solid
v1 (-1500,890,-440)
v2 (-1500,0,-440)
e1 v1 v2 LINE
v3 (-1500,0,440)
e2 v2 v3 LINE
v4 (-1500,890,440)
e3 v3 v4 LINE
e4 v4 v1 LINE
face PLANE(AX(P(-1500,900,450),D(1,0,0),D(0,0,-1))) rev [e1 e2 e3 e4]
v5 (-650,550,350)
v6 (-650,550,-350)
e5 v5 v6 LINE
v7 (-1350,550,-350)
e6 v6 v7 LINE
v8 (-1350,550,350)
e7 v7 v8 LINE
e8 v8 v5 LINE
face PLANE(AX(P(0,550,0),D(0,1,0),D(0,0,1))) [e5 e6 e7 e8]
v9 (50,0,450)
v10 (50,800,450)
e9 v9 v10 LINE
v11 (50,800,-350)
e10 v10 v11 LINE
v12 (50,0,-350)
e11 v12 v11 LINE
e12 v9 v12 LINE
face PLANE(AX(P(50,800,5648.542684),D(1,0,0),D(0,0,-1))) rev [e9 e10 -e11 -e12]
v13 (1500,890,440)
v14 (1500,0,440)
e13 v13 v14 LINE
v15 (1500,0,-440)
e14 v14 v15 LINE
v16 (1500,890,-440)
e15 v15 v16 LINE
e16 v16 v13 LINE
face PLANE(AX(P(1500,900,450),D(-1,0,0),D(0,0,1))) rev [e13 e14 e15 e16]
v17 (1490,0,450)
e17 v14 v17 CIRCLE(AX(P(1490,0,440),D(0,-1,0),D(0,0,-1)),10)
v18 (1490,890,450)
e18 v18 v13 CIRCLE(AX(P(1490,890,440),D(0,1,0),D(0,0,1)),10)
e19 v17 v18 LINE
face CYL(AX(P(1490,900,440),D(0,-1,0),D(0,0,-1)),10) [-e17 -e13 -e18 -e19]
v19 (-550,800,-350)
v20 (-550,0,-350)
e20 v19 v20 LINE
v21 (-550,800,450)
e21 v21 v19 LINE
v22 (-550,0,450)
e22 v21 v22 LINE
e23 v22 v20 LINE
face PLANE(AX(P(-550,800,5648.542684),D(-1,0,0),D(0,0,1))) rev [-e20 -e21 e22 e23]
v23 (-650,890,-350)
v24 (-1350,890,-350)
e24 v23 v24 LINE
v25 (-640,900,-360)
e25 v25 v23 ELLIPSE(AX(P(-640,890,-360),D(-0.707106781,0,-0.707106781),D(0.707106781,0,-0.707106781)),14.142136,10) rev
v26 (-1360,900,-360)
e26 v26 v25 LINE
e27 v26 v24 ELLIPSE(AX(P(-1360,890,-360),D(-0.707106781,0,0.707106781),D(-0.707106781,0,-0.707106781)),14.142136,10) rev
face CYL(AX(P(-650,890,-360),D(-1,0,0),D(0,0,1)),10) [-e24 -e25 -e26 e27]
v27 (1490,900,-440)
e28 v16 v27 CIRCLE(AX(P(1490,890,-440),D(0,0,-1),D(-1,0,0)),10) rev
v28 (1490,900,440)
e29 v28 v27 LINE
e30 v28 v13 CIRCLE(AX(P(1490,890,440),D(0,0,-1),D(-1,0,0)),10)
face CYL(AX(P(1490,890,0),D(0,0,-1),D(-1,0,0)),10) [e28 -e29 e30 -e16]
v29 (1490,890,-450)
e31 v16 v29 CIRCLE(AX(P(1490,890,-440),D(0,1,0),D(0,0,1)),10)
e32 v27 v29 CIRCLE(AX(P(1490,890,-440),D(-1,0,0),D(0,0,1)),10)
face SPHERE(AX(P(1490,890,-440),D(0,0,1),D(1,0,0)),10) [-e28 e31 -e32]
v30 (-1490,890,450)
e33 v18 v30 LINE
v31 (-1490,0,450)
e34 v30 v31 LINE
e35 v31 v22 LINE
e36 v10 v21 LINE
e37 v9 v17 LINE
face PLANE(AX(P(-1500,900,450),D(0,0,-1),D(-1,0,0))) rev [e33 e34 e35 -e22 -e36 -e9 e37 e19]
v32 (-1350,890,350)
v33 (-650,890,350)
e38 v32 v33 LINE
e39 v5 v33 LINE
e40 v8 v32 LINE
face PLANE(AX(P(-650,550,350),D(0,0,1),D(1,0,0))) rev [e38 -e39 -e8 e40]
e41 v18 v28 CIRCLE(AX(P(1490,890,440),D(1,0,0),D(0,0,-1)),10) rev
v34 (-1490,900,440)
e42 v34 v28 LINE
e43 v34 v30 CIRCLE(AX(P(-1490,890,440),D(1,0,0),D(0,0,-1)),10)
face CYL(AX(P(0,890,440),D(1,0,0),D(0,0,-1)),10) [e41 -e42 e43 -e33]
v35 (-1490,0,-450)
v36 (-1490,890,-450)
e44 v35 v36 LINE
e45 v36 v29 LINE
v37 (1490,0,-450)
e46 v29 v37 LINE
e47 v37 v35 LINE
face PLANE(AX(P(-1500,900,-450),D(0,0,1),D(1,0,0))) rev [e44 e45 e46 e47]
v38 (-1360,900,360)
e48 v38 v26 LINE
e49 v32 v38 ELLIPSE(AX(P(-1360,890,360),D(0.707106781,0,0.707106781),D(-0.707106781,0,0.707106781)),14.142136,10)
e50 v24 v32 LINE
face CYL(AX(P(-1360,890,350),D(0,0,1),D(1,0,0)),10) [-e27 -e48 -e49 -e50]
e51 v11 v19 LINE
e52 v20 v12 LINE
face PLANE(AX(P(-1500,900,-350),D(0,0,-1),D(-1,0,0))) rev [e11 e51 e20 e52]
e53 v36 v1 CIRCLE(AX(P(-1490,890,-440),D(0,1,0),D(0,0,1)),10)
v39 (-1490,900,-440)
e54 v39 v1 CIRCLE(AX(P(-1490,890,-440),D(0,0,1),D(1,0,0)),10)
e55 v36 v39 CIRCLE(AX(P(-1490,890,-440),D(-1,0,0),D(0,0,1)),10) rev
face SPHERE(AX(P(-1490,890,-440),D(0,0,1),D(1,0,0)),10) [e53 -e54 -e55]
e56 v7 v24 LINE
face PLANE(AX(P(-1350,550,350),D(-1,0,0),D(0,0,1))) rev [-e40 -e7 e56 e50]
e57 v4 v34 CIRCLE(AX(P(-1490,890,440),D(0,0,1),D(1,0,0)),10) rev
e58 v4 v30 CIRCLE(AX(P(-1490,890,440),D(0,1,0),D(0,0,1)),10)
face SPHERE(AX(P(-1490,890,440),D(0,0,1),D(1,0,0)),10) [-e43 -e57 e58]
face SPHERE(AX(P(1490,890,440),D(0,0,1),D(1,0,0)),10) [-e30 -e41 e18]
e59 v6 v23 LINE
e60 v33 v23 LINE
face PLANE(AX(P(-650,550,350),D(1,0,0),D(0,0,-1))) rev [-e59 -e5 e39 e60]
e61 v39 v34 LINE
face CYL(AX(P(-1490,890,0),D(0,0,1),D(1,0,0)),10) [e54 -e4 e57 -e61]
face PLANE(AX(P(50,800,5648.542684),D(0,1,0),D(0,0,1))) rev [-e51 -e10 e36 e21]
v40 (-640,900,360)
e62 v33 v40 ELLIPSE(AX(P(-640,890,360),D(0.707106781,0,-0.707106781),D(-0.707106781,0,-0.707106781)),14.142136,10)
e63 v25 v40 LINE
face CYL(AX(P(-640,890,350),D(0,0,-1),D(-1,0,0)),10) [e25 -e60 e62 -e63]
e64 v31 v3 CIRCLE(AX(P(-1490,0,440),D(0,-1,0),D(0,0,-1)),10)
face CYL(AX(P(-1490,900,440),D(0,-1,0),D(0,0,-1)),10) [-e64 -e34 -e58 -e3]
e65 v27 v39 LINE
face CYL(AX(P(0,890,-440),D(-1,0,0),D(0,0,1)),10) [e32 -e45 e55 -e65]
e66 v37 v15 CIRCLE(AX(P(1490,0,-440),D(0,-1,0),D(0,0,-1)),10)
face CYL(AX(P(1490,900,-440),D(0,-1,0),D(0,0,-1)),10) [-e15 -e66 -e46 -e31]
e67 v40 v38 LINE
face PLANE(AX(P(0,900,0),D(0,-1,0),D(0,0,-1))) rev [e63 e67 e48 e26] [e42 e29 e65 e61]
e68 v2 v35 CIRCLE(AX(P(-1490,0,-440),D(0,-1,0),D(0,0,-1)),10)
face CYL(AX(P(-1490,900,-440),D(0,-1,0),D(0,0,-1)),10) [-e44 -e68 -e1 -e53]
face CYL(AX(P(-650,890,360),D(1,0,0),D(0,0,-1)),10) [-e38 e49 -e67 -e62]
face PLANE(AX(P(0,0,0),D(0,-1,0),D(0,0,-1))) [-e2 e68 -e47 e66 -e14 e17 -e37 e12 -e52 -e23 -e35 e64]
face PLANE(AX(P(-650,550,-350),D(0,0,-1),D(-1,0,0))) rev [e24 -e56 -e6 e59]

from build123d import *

# Parameters (mm, degrees)
SKETCH1_W               = 3000
SKETCH1_H               = 900
BOSS_EXTRUDE1_DEPTH     = 900
CUT_EXTRUDE2_DEPTH      = 1968.231557291
CUT_EXTRUDE2_DEPTH_BACK = 800
SKETCH2_W               = 700
SKETCH2_H               = 700
CUT_EXTRUDE3_DEPTH      = 350
FILLET1_R               = 10
FILLET2_R               = 10


with BuildPart() as part:
    # Sketch1 → Boss-Extrude1 (new body)
    with BuildSketch(Plane(origin=(0, 0, 0), x_dir=(1, 0, 0), z_dir=(0, 1, 0))):
        Rectangle(SKETCH1_W, SKETCH1_H)
    extrude(amount=BOSS_EXTRUDE1_DEPTH)

    # Sketch3 → Cut-Extrude2 (cut, two sides: drawn at the far end of the back side and taken through both)
    with BuildSketch(Plane.XY.offset(450).offset(-CUT_EXTRUDE2_DEPTH_BACK)):
        Polygon((50, -4487.722635448), (50, 0), (50, 800), (-550, 800), (-550, 0), (-550, -4487.722635448), (-550, -13463.167906343), (50, -13463.167906343), align=None)
    extrude(amount=CUT_EXTRUDE2_DEPTH + CUT_EXTRUDE2_DEPTH_BACK, mode=Mode.SUBTRACT)

    # Sketch2 → Cut-Extrude3 (cut)
    with BuildSketch(Plane(origin=(0, 900, 0), x_dir=(1, 0, 0), z_dir=(0, 1, 0))):
        with Locations((-1000, 0)):
            Rectangle(SKETCH2_W, SKETCH2_H)
    extrude(amount=-CUT_EXTRUDE3_DEPTH, mode=Mode.SUBTRACT)

    # Fillet1
    fillet1_edges = [part.edges().sort_by_distance(p)[0] for p in [
        (-1500, 900, 0),
        (0, 900, 450),
        (-1350, 900, 0),
        (-1000, 900, 350),
        (-650, 900, 0),
        (-1000, 900, -350),
        (1500, 900, 0),
        (0, 900, -450),
    ]]
    fillet(fillet1_edges, radius=FILLET1_R)

    # Fillet2
    # the kernel refuses this fillet: 10 mm, written as the material it takes off along each edge
    with BuildSketch(Plane(origin=(-1490, 890, -440), x_dir=(0, 0, -1), z_dir=(-1, 0, 0))) as fillet2_piece_1_section:
        Polygon((0, 0), (FILLET2_R, 0), (FILLET2_R, -FILLET2_R), (0, -FILLET2_R), align=None)
    fillet2_piece_1 = extrude(amount=FILLET2_R, mode=Mode.PRIVATE)
    fillet2_piece_1 = fillet2_piece_1 - Plane(origin=(-1490, 890, -440), x_dir=(0, -0.7071067811865475, 0.7071067811865475), z_dir=(-1, 0, 0)) * Sphere(FILLET2_R, mode=Mode.PRIVATE)
    add(fillet2_piece_1, mode=Mode.SUBTRACT)
    with BuildSketch(Plane(origin=(1490, 890, -440), x_dir=(0, 0, -1), z_dir=(1, 0, 0))) as fillet2_piece_2_section:
        Polygon((0, 0), (FILLET2_R, 0), (FILLET2_R, FILLET2_R), (0, FILLET2_R), align=None)
    fillet2_piece_2 = extrude(amount=FILLET2_R, mode=Mode.PRIVATE)
    fillet2_piece_2 = fillet2_piece_2 - Plane(origin=(1490, 890, -440), x_dir=(0, -0.7071067811865475, 0.7071067811865475), z_dir=(1, 0, 0)) * Sphere(FILLET2_R, mode=Mode.PRIVATE)
    add(fillet2_piece_2, mode=Mode.SUBTRACT)
    with BuildSketch(Plane(origin=(-1490, 890, 440), x_dir=(-1, 0, 0), z_dir=(0, 0, 1))) as fillet2_piece_3_section:
        Polygon((0, 0), (FILLET2_R, 0), (FILLET2_R, -FILLET2_R), (0, -FILLET2_R), align=None)
    fillet2_piece_3 = extrude(amount=FILLET2_R, mode=Mode.PRIVATE)
    fillet2_piece_3 = fillet2_piece_3 - Plane(origin=(-1490, 890, 440), x_dir=(0.7071067811865475, -0.7071067811865475, 0), z_dir=(0, 0, 1)) * Sphere(FILLET2_R, mode=Mode.PRIVATE)
    add(fillet2_piece_3, mode=Mode.SUBTRACT)
    with BuildSketch(Plane(origin=(1490, 890, 440), x_dir=(1, 0, 0), z_dir=(0, 0, 1))) as fillet2_piece_4_section:
        Polygon((0, 0), (FILLET2_R, 0), (FILLET2_R, FILLET2_R), (0, FILLET2_R), align=None)
    fillet2_piece_4 = extrude(amount=FILLET2_R, mode=Mode.PRIVATE)
    fillet2_piece_4 = fillet2_piece_4 - Plane(origin=(1490, 890, 440), x_dir=(-0.7071067811865475, -0.7071067811865475, 0), z_dir=(0, 0, 1)) * Sphere(FILLET2_R, mode=Mode.PRIVATE)
    add(fillet2_piece_4, mode=Mode.SUBTRACT)
    with BuildSketch(Plane(origin=(1500, -25, 450), x_dir=(-1, 0, 0), z_dir=(0, 1, 0)), Plane(origin=(1500, -25, -450), x_dir=(0, 0, 1), z_dir=(0, 1, 0))) as fillet2_piece_5:
        with BuildLine():
            CenterArc((FILLET2_R, -FILLET2_R), FILLET2_R, 90, 90)
            Line((0, -FILLET2_R), (0, 0))
            Line((0, 0), (FILLET2_R, 0))
        make_face()
    extrude(amount=915, mode=Mode.SUBTRACT)
    with BuildSketch(Plane(origin=(-1500, -25, 450), x_dir=(1, 0, 0), z_dir=(0, 1, 0)), Plane(origin=(-1500, -25, -450), x_dir=(0, 0, 1), z_dir=(0, 1, 0))) as fillet2_piece_6:
        with BuildLine():
            CenterArc((FILLET2_R, FILLET2_R), FILLET2_R, 180, 90)
            Line((0, FILLET2_R), (0, 0))
            Line((0, 0), (FILLET2_R, 0))
        make_face()
    extrude(amount=915, mode=Mode.SUBTRACT)


solid = part.part
